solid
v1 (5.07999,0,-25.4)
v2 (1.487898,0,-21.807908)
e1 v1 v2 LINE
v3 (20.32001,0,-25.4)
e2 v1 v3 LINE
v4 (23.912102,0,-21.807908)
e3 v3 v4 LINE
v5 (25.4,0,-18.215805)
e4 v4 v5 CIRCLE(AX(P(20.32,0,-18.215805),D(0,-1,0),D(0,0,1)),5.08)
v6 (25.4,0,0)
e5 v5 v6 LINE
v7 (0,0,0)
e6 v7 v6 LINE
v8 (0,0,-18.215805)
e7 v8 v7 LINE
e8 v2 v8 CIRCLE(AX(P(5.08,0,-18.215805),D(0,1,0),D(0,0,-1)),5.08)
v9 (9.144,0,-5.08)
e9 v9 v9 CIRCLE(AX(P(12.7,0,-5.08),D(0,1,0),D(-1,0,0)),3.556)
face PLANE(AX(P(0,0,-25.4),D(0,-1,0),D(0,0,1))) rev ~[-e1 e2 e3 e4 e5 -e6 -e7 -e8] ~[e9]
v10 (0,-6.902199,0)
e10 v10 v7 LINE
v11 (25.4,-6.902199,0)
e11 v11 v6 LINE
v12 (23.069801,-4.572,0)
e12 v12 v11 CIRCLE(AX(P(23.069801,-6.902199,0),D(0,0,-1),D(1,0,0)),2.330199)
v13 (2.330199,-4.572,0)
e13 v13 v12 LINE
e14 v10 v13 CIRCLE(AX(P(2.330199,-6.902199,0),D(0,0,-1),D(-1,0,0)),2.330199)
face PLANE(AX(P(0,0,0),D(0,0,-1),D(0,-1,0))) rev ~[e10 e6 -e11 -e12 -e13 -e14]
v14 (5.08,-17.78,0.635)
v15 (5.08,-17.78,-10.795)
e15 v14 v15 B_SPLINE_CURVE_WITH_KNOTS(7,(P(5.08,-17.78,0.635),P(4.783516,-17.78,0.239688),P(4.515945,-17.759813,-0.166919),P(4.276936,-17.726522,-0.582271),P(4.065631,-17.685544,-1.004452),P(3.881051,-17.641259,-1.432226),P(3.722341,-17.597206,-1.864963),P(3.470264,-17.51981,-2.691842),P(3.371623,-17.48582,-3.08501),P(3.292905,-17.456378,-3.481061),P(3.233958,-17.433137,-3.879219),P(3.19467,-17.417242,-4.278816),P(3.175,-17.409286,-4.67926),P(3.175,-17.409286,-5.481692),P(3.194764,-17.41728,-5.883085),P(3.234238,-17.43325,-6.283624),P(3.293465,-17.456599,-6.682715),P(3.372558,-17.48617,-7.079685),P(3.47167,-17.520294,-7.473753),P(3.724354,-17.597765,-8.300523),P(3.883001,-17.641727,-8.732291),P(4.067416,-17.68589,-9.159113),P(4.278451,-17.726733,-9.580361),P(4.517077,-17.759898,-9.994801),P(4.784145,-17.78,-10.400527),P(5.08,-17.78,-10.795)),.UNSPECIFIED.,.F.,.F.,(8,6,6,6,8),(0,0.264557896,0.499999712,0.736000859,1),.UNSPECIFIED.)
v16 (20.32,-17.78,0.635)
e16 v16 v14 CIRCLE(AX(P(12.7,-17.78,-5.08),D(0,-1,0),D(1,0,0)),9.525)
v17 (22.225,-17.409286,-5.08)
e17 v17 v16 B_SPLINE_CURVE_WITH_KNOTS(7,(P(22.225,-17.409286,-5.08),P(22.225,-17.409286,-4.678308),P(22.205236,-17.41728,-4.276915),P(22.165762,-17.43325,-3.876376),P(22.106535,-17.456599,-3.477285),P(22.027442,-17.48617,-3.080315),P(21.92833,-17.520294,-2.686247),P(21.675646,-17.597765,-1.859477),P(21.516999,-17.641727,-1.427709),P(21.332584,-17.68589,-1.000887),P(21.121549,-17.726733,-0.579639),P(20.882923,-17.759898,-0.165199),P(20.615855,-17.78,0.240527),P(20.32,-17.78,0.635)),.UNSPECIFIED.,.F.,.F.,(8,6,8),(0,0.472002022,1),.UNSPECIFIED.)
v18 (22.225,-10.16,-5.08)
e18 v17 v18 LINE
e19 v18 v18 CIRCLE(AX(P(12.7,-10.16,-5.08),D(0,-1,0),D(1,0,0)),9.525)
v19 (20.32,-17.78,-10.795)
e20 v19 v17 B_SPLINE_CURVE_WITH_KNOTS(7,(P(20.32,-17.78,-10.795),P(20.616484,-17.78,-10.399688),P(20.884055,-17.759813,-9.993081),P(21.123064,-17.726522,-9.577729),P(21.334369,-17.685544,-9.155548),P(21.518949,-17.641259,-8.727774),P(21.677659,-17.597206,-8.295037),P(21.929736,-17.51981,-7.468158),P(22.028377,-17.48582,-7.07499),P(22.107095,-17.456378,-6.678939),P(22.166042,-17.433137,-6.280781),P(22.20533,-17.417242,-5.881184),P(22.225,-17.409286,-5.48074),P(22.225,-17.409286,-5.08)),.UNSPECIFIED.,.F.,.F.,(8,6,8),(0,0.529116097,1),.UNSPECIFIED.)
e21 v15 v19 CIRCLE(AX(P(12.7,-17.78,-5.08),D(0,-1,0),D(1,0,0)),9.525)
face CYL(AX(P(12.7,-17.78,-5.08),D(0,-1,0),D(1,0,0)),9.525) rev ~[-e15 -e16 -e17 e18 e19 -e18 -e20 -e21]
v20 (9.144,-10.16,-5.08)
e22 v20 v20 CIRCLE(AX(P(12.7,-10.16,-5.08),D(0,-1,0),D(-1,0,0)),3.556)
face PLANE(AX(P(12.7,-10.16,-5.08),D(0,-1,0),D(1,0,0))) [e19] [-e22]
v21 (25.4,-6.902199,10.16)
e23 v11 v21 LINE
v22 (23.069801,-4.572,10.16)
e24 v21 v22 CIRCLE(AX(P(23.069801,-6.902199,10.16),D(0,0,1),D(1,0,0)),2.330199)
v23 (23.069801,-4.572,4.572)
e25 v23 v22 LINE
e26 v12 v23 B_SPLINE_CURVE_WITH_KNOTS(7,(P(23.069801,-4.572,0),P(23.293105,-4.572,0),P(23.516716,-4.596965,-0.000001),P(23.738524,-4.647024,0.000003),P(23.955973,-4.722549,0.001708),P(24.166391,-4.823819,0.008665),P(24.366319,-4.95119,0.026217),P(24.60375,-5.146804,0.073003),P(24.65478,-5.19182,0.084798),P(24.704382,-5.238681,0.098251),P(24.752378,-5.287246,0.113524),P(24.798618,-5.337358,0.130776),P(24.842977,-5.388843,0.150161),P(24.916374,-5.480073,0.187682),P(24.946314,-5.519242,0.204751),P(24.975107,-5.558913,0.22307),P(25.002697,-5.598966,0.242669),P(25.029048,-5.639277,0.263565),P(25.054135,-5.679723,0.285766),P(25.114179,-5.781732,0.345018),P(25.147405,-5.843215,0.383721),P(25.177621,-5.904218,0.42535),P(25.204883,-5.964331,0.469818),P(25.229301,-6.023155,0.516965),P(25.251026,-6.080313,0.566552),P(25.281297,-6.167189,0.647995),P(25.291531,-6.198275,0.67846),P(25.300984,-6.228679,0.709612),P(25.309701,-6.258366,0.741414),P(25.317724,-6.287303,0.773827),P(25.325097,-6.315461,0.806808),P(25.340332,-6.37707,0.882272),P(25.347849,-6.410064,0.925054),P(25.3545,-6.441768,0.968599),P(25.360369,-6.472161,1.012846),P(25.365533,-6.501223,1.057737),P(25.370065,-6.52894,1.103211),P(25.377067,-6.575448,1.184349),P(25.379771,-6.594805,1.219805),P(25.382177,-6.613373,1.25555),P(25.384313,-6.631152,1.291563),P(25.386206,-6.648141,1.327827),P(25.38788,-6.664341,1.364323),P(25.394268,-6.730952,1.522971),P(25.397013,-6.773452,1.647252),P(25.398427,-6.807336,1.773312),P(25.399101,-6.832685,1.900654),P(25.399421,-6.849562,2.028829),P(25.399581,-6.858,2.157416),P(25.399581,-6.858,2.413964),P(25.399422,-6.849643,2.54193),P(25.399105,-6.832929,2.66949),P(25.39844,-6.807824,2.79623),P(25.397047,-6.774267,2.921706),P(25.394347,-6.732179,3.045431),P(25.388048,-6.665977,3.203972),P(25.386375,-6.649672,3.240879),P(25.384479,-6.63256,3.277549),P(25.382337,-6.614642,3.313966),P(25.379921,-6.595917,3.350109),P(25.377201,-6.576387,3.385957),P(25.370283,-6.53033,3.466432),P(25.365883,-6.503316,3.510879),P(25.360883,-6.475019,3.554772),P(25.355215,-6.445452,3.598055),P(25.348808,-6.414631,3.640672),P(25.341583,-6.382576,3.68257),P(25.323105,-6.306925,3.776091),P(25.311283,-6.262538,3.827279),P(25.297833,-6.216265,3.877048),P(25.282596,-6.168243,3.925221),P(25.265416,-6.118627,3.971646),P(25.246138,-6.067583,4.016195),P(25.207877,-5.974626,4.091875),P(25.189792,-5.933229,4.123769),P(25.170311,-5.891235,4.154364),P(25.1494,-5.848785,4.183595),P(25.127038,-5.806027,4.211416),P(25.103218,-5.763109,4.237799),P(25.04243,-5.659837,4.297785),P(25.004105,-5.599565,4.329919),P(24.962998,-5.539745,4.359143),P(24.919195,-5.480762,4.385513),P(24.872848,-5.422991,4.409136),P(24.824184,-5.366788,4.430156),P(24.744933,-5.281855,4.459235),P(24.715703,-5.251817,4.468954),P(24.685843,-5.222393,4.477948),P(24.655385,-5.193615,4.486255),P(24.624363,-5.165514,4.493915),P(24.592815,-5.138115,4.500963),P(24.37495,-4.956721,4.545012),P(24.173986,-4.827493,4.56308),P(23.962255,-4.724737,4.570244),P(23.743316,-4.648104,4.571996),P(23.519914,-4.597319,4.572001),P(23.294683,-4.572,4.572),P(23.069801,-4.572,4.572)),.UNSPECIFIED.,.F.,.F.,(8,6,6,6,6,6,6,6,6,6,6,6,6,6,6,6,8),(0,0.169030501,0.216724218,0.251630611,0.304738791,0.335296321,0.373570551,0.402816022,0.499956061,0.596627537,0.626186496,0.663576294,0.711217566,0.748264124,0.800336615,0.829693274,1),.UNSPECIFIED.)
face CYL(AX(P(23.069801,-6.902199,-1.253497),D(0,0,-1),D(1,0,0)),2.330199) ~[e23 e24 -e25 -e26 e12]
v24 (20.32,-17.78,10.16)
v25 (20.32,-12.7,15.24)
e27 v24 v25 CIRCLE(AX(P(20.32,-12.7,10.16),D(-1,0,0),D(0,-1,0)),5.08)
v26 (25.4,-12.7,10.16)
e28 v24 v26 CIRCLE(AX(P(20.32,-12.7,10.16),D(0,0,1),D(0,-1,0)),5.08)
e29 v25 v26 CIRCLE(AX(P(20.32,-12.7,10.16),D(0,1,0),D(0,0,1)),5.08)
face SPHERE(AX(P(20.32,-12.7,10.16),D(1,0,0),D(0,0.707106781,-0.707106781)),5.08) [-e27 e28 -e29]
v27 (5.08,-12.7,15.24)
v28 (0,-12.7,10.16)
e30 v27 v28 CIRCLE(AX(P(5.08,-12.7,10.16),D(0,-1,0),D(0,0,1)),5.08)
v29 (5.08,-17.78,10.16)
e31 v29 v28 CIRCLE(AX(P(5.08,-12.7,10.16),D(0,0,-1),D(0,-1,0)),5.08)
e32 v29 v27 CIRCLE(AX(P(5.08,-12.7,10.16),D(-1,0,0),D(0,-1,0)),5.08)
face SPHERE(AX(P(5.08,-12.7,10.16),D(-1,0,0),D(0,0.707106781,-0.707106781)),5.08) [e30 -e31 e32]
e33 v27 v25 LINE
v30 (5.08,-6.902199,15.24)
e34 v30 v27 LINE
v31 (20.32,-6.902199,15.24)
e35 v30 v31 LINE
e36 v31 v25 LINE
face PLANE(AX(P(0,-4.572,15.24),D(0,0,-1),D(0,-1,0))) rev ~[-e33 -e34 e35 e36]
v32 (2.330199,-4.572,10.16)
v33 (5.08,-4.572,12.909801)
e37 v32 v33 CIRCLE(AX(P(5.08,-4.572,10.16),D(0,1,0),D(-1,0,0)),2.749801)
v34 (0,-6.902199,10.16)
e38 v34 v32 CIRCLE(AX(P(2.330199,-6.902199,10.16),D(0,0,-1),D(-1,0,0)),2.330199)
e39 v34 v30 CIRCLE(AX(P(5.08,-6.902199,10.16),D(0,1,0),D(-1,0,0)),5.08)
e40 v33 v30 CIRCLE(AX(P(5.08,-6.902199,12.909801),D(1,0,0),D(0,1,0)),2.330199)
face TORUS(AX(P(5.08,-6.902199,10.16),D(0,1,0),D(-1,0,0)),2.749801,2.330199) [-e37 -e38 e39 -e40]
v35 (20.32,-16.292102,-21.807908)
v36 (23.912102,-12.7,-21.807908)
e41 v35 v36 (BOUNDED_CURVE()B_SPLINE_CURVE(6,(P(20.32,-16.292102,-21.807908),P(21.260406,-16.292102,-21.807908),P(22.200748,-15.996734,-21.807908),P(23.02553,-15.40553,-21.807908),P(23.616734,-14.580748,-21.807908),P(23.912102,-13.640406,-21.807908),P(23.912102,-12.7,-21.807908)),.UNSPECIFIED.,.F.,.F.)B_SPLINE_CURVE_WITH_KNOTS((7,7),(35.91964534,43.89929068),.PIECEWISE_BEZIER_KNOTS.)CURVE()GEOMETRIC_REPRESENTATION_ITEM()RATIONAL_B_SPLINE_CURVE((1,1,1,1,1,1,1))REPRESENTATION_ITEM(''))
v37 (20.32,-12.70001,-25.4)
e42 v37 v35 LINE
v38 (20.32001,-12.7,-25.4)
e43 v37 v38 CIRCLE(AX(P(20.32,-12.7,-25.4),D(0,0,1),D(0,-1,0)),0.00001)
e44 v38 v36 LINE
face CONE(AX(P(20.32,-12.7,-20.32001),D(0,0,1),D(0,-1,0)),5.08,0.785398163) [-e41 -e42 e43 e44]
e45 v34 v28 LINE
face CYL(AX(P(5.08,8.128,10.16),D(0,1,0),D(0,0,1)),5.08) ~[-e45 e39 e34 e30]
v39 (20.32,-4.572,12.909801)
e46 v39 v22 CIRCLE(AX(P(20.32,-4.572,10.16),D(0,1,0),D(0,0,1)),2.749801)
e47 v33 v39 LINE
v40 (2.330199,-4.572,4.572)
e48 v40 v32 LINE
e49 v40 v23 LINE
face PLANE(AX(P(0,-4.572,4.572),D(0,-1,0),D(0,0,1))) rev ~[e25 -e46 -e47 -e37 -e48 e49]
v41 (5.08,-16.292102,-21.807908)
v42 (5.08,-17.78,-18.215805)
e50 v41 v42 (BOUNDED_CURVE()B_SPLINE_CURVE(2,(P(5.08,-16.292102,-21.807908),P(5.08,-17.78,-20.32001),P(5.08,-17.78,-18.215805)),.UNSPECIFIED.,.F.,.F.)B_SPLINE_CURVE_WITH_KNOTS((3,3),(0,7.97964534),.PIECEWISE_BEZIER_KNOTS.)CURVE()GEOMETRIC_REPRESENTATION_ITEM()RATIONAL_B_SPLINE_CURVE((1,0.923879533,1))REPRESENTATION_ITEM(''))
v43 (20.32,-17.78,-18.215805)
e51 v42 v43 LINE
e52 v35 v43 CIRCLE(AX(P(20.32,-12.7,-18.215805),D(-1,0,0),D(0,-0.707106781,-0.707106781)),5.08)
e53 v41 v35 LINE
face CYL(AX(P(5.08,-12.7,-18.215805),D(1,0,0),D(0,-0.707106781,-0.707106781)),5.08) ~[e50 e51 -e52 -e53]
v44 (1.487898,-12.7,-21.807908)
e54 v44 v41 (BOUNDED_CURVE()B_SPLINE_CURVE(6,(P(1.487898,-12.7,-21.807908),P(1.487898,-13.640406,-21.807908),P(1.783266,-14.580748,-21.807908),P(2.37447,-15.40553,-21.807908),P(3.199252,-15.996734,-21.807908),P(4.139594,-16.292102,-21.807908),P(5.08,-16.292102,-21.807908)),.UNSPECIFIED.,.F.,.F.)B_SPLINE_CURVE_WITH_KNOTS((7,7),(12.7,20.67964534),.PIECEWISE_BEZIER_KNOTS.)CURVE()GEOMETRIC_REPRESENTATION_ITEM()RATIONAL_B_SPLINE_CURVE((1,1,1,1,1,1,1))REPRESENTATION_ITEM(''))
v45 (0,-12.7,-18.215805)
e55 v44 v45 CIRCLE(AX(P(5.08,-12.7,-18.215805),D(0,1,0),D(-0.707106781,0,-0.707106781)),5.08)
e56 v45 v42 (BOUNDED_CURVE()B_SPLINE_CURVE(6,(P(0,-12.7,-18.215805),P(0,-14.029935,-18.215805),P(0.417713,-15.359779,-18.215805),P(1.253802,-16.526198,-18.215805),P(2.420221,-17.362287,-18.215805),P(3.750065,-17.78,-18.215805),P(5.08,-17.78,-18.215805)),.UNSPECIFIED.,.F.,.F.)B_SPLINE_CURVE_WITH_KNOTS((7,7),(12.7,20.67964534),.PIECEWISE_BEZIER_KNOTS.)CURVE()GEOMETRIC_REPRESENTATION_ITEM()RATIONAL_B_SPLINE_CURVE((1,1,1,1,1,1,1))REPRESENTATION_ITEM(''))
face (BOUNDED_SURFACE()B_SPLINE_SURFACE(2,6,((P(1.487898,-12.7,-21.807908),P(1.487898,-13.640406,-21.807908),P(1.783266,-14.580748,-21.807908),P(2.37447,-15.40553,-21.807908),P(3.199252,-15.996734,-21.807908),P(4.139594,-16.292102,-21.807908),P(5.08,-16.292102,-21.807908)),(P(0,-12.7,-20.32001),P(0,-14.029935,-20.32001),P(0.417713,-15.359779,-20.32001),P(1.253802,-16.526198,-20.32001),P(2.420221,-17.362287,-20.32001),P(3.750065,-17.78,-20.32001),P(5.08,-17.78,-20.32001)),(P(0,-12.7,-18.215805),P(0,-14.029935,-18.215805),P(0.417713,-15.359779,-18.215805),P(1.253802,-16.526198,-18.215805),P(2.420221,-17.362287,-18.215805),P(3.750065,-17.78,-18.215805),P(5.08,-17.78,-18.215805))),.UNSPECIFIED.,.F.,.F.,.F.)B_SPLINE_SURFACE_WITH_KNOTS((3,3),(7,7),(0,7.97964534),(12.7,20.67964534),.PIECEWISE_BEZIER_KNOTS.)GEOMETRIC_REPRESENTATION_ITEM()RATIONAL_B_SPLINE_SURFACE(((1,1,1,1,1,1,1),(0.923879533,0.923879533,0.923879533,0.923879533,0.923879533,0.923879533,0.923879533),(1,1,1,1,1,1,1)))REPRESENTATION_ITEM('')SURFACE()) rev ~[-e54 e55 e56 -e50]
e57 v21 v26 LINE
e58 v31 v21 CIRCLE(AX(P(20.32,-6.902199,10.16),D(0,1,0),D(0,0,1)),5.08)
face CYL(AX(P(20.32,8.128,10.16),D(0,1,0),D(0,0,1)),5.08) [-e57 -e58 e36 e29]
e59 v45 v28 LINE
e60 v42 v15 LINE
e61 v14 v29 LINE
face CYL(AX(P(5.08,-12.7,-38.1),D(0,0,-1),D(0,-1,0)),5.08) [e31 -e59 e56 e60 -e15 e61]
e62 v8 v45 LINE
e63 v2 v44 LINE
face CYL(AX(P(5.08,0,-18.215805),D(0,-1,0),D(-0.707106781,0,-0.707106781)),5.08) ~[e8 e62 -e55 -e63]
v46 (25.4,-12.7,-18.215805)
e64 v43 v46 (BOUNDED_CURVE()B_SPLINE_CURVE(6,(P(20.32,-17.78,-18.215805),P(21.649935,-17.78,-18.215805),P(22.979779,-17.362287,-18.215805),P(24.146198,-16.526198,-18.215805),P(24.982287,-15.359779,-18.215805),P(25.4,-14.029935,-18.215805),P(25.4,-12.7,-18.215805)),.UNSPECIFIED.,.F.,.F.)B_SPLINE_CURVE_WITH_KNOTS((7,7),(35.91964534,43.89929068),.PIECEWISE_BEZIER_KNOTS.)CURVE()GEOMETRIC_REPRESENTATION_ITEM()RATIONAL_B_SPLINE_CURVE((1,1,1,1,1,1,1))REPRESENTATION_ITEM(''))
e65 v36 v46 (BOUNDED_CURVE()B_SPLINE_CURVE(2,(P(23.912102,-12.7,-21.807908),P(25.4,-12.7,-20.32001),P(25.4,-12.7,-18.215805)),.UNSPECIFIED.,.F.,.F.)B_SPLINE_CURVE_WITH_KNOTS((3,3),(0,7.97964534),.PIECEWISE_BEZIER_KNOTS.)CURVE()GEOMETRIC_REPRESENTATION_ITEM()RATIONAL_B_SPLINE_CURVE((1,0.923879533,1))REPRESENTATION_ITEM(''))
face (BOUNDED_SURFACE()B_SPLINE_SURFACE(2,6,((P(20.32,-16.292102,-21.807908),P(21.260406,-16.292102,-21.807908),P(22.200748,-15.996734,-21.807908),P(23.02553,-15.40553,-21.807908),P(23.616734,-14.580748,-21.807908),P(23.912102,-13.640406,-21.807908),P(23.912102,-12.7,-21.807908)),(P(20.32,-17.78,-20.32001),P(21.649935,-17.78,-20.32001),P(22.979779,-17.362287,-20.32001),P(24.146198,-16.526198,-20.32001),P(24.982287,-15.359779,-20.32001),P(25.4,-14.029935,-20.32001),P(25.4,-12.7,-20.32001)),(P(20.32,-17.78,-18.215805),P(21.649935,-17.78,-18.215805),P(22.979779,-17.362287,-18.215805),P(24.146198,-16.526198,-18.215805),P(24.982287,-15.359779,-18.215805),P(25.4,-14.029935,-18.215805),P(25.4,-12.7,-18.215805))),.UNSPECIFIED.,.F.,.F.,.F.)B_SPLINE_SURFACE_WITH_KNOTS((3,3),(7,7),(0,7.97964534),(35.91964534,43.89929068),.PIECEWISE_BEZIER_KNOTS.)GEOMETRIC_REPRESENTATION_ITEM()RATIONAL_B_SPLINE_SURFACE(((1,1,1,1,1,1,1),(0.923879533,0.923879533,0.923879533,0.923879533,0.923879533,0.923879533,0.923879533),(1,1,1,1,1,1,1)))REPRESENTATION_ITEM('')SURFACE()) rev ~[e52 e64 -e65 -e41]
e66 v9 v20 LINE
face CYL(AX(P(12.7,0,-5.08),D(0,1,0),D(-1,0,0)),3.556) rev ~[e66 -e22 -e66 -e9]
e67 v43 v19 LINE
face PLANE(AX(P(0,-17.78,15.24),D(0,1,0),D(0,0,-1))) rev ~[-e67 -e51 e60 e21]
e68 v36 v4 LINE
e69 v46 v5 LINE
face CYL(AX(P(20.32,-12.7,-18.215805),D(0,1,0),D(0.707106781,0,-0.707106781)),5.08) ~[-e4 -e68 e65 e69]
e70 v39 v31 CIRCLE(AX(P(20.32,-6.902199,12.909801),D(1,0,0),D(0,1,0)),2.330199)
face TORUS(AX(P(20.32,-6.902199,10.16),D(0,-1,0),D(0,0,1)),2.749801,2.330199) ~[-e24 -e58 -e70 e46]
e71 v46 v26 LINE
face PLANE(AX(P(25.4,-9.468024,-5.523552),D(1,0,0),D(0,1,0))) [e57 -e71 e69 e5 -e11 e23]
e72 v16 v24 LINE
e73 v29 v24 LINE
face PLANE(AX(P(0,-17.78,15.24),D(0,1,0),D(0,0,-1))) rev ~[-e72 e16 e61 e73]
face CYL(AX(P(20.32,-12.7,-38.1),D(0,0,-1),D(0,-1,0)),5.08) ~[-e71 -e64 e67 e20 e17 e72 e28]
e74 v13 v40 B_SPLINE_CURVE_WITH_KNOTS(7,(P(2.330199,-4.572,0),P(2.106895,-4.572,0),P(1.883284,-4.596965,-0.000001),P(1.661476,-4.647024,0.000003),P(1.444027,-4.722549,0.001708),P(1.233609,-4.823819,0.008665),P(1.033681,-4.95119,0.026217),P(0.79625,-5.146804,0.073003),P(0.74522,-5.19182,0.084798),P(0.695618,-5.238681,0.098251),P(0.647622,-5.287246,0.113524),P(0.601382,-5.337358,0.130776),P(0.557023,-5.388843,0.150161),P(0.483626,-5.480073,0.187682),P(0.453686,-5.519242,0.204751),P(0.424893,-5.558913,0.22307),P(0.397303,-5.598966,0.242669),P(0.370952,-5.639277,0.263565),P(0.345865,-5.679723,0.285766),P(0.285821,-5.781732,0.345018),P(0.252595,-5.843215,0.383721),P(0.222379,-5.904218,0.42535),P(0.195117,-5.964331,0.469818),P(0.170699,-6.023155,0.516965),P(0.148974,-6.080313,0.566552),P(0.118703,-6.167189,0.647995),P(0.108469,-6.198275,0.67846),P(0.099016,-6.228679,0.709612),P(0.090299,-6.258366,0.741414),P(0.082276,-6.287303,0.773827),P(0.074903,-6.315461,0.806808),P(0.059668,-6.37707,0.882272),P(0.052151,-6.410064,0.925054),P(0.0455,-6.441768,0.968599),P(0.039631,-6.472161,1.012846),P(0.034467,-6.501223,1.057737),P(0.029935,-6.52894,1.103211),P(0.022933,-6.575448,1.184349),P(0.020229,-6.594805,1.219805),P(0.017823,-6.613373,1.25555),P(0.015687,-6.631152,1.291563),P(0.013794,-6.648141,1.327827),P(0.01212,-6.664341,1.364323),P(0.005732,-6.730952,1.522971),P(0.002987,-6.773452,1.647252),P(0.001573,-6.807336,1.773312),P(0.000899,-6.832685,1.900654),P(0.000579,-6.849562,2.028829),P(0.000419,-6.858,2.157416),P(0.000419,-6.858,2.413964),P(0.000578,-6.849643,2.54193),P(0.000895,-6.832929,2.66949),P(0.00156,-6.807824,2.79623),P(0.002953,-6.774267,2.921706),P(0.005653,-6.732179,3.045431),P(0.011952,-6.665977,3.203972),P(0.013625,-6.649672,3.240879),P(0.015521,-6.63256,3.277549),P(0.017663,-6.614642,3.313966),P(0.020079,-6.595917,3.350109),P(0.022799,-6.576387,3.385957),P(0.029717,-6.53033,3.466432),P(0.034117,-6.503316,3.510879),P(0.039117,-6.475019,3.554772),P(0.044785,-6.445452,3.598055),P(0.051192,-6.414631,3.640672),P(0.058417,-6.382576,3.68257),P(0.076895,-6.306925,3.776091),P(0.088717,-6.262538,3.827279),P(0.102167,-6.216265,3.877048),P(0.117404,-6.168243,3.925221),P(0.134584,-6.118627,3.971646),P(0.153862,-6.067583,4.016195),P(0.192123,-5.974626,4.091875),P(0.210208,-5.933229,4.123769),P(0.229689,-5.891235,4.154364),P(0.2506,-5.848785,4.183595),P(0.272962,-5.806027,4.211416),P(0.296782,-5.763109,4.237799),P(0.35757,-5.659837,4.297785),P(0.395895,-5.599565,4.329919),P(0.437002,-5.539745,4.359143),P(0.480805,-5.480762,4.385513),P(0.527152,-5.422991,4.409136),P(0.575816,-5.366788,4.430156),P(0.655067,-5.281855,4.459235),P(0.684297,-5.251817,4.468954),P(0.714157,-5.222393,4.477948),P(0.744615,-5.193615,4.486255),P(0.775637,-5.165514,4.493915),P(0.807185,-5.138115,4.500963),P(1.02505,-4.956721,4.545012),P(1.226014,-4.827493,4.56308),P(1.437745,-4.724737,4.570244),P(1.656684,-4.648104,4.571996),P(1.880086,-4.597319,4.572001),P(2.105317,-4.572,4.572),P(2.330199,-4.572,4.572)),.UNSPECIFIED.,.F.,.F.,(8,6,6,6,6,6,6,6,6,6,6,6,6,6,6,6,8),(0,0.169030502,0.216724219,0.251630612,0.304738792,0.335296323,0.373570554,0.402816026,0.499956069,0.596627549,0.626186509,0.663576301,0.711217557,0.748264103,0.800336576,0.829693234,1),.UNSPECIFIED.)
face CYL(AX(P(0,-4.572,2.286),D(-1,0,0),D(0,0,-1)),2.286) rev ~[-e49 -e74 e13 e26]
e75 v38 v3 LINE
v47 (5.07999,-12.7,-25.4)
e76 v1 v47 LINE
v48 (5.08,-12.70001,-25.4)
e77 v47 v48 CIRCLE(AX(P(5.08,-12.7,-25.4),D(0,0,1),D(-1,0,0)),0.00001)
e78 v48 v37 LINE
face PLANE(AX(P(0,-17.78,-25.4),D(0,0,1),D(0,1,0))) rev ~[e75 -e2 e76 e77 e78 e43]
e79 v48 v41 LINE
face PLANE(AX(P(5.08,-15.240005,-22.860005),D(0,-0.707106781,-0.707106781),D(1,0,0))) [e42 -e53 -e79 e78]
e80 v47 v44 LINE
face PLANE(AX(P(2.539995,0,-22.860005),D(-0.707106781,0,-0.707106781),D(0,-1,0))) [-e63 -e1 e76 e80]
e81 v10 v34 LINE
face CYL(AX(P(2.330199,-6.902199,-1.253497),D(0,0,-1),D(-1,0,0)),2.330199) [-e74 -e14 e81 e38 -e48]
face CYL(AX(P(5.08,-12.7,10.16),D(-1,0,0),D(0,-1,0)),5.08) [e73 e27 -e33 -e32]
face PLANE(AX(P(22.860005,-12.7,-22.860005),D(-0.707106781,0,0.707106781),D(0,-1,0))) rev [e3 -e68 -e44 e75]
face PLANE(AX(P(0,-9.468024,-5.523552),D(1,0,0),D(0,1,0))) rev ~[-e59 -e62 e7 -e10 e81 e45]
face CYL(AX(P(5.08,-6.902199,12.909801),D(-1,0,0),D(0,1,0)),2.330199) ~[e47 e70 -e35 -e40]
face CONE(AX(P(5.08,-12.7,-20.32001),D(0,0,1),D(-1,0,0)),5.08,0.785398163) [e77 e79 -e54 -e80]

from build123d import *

# Parameters (mm, degrees)
F1_DEPTH     = 25.4
F2_R         = 3.556
F3_DEPTH     = 17.78
F4_R         = 9.525
F4_R_2       = 3.556
F5_DEPTH     = 7.62
F6_T1_DEPTH  = 48.26
F6_T3_DEPTH  = 20.828
F6_T5_DEPTH  = 15.24
F6_S9_W      = 5.08
F6_S9_H      = 5.08
F6_T10_DEPTH = 5.08
F6_S15_W     = 5.08
F6_S15_H     = 5.08
F6_T16_DEPTH = 5.08
F7_SIZE      = 5.07999
F8_R         = 5.08
F9_T3_DEPTH  = 15.24
F9_T6_DEPTH  = 11.413497326
F9_T10_DEPTH = 11.413497326
F9_T14_ANGLE = 89.9999999979
F9_T17_ANGLE = 89.9999999979


# Not quite as in the source:
# - a fillet or chamfer that OpenCascade refuses, or shapes differently, is made with other operations: its cross-section is extruded or revolved along the edge and cut away or added
# - a fillet or chamfer is up to 0.001 mm smaller than in the source, because OpenCascade refuses the exact size


with BuildPart() as f1:
    # F0 (on Right) → F1 (new body)
    with BuildSketch(Plane.YZ):
        with BuildLine():
            Line((0, -25.4), (0, 0))
            Line((0, 0), (-4.572, 0))
            ThreePointArc((-4.572, 0), (-6.858, 2.286), (-4.572, 4.572))
            Line((-4.572, 4.572), (-4.572, 15.24))
            Line((-4.572, 15.24), (-17.78, 15.24))
            Line((-17.78, 15.24), (-17.78, 0))
            Line((-17.78, 0), (-17.78, -25.4))
            Line((-17.78, -25.4), (0, -25.4))
        make_face()
    extrude(amount=F1_DEPTH)

    # F2 (on face) → F3 (cut, through all)
    with BuildSketch(Plane(origin=(0, 0, 0), x_dir=(-1, 0, 0), z_dir=(0, 1, 0))):
        with Locations((-12.7, -5.08)):
            Circle(F2_R)
    extrude(amount=-F3_DEPTH, mode=Mode.SUBTRACT)

    # F4 (on face) → F5 (cut)
    with BuildSketch(Plane.XZ.offset(17.78)):
        with Locations((12.7, -5.08)):
            Circle(F4_R)
        with Locations((12.7, -5.08)):
            Circle(F4_R_2, mode=Mode.SUBTRACT)
    extrude(amount=-F5_DEPTH, mode=Mode.SUBTRACT)

    # F6: fillet of radius 5.08 on 5 edges, made by hand

    # F6_s2 → F6_t1 (cut)
    with BuildSketch(Plane.XY.offset(-38.1)):
        with BuildLine():
            ThreePointArc((5.08, -17.78), (1.4878975516, -16.2921024484), (0, -12.7))
            Line((0, -12.7), (0, -17.78))
            Line((0, -17.78), (5.08, -17.78))
        make_face()
        with BuildLine():
            ThreePointArc((20.32, -17.78), (23.9121024484, -16.2921024484), (25.4, -12.7))
            Line((25.4, -12.7), (25.4, -17.78))
            Line((25.4, -17.78), (20.32, -17.78))
        make_face()
    extrude(amount=F6_T1_DEPTH, mode=Mode.SUBTRACT)

    # F6_s4 → F6_t3 (cut)
    with BuildSketch(Plane.XZ.offset(-8.128)):
        with BuildLine():
            ThreePointArc((20.32, 15.24), (23.9121024484, 13.7521024484), (25.4, 10.16))
            Line((25.4, 10.16), (25.4, 15.24))
            Line((25.4, 15.24), (20.32, 15.24))
        make_face()
        with BuildLine():
            ThreePointArc((5.08, 15.24), (1.4878975516, 13.7521024484), (0, 10.16))
            Line((0, 10.16), (0, 15.24))
            Line((0, 15.24), (5.08, 15.24))
        make_face()
    extrude(amount=F6_T3_DEPTH, mode=Mode.SUBTRACT)

    # F6_s6 → F6_t5 (cut)
    with BuildSketch(Plane.YZ.offset(5.08)):
        with BuildLine():
            ThreePointArc((-17.78, 10.16), (-16.2921024484, 13.7521024484), (-12.7, 15.24))
            Line((-12.7, 15.24), (-17.78, 15.24))
            Line((-17.78, 15.24), (-17.78, 10.16))
        make_face()
    extrude(amount=F6_T5_DEPTH, mode=Mode.SUBTRACT)


with BuildPart() as f6_tool8:
    # F6_s9 → F6_t10 (new body)
    with BuildSketch(Plane.YZ.offset(5.08)):
        with Locations((-15.24, 12.7)):
            Rectangle(F6_S9_W, F6_S9_H)
    extrude(amount=-F6_T10_DEPTH)

    # F6_s11 → F6_t12 (revolve, cut)
    with BuildSketch(Plane(origin=(5.08, -12.7, 10.16), x_dir=(0, 0.7071067812, -0.7071067812), z_dir=(0, 0.7071067812, 0.7071067812))):
        with BuildLine():
            ThreePointArc((0, -5.08), (5.08, 0), (0, 5.08))
            Line((0, 5.08), (0, -5.08))
        make_face()
    revolve(axis=Axis((5.08, -12.7, 10.16), (-1, 0, 0)), mode=Mode.SUBTRACT)


with BuildPart() as f1_1:
    add(f1.part)

    # F6_t7: cut F6_tool8
    add(f6_tool8.part, mode=Mode.SUBTRACT)


with BuildPart() as f6_tool14:
    # F6_s15 → F6_t16 (new body)
    with BuildSketch(Plane.YZ.offset(20.32)):
        with Locations((-15.24, 12.7)):
            Rectangle(F6_S15_W, F6_S15_H)
    extrude(amount=F6_T16_DEPTH)

    # F6_s17 → F6_t18 (revolve, cut)
    with BuildSketch(Plane(origin=(20.32, -12.7, 10.16), x_dir=(0, 0.7071067812, -0.7071067812), z_dir=(0, -0.7071067812, -0.7071067812))):
        with BuildLine():
            ThreePointArc((0, -5.08), (5.08, 0), (0, 5.08))
            Line((0, 5.08), (0, -5.08))
        make_face()
    revolve(axis=Axis((20.32, -12.7, 10.16), (1, 0, 0)), mode=Mode.SUBTRACT)


with BuildPart() as f1_2:
    add(f1_1.part)

    # F6_t13: cut F6_tool14
    add(f6_tool14.part, mode=Mode.SUBTRACT)

    # F7 (size 5.08 in the source; OpenCascade refuses exactly that, so slightly less here)
    f7_edges = [f1_2.edges().sort_by_distance(p)[0] for p in [
        (12.7, -17.78, -25.4),
    ]]
    chamfer(f7_edges, length=F7_SIZE)

    # F8
    f8_edges = [f1_2.edges().sort_by_distance(p)[0] for p in [
        (12.7, -17.78, -20.32001),
        (0, -6.35, -20.32001),
        (25.4, -6.35, -20.32001),
        (1.487898, -16.292102, -20.32001),
        (23.912102, -16.292102, -20.32001),
    ]]
    fillet(f8_edges, radius=F8_R)

    # F9: fillet of radius 2.3301989304 on 5 edges, made by hand


with BuildPart() as f9_tool1:
    # F9_s2 → F9_t3 (new body)
    with BuildSketch(Plane.YZ.offset(5.08)):
        with BuildLine():
            ThreePointArc((-4.572, 12.9098010696), (-5.2544994652, 14.5575005348), (-6.9021989304, 15.24))
            Line((-6.9021989304, 15.24), (-4.572, 15.24))
            Line((-4.572, 15.24), (-4.572, 12.9098010696))
        make_face()
    extrude(amount=F9_T3_DEPTH)


with BuildPart() as f9_tool4:
    # F9_s5 → F9_t6 (new body)
    with BuildSketch(Plane.XY.offset(-1.253497326)):
        with BuildLine():
            ThreePointArc((0, -6.9021989304), (0.6824994652, -5.2544994652), (2.3301989304, -4.572))
            Line((2.3301989304, -4.572), (0, -4.572))
            Line((0, -4.572), (0, -6.9021989304))
        make_face()
    extrude(amount=F9_T6_DEPTH)

    split(bisect_by=Plane.XY, keep=Keep.TOP)


with BuildPart() as f9_tool8:
    # F9_s9 → F9_t10 (new body)
    with BuildSketch(Plane.XY.offset(-1.253497326)):
        with BuildLine():
            ThreePointArc((25.4, -6.9021989304), (24.7175005348, -5.2544994652), (23.0698010696, -4.572))
            Line((23.0698010696, -4.572), (25.4, -4.572))
            Line((25.4, -4.572), (25.4, -6.9021989304))
        make_face()
    extrude(amount=F9_T10_DEPTH)

    split(bisect_by=Plane.XY, keep=Keep.TOP)


with BuildPart() as f9_tool12:
    # F9_s13 → F9_t14 (revolve)
    with BuildSketch(Plane.XY.offset(10.1599999999)):
        with BuildLine():
            ThreePointArc((0, -6.9021989304), (0.6824994652, -5.2544994652), (2.3301989304, -4.572))
            Line((2.3301989304, -4.572), (0, -4.572))
            Line((0, -4.572), (0, -6.9021989304))
        make_face()
    revolve(axis=Axis((5.0800000001, -4.572, 10.1599999999), (0, 1, 0)), revolution_arc=F9_T14_ANGLE)


with BuildPart() as f9_tool15:
    # F9_s16 → F9_t17 (revolve)
    with BuildSketch(Plane.YZ.offset(20.3199999999)):
        with BuildLine():
            ThreePointArc((-4.572, 12.9098010696), (-5.2544994652, 14.5575005348), (-6.9021989304, 15.24))
            Line((-6.9021989304, 15.24), (-4.572, 15.24))
            Line((-4.572, 15.24), (-4.572, 12.9098010696))
        make_face()
    revolve(axis=Axis((20.3199999999, -4.572, 10.1599999999), (0, 1, 0)), revolution_arc=F9_T17_ANGLE)


with BuildPart() as f1_3:
    add(f1_2.part)

    # F9_t18: cut F9_tool1, F9_tool4, F9_tool8, F9_tool12, F9_tool15
    add([f9_tool1.part, f9_tool4.part, f9_tool8.part, f9_tool12.part, f9_tool15.part], mode=Mode.SUBTRACT)


solid = f1_3.part
